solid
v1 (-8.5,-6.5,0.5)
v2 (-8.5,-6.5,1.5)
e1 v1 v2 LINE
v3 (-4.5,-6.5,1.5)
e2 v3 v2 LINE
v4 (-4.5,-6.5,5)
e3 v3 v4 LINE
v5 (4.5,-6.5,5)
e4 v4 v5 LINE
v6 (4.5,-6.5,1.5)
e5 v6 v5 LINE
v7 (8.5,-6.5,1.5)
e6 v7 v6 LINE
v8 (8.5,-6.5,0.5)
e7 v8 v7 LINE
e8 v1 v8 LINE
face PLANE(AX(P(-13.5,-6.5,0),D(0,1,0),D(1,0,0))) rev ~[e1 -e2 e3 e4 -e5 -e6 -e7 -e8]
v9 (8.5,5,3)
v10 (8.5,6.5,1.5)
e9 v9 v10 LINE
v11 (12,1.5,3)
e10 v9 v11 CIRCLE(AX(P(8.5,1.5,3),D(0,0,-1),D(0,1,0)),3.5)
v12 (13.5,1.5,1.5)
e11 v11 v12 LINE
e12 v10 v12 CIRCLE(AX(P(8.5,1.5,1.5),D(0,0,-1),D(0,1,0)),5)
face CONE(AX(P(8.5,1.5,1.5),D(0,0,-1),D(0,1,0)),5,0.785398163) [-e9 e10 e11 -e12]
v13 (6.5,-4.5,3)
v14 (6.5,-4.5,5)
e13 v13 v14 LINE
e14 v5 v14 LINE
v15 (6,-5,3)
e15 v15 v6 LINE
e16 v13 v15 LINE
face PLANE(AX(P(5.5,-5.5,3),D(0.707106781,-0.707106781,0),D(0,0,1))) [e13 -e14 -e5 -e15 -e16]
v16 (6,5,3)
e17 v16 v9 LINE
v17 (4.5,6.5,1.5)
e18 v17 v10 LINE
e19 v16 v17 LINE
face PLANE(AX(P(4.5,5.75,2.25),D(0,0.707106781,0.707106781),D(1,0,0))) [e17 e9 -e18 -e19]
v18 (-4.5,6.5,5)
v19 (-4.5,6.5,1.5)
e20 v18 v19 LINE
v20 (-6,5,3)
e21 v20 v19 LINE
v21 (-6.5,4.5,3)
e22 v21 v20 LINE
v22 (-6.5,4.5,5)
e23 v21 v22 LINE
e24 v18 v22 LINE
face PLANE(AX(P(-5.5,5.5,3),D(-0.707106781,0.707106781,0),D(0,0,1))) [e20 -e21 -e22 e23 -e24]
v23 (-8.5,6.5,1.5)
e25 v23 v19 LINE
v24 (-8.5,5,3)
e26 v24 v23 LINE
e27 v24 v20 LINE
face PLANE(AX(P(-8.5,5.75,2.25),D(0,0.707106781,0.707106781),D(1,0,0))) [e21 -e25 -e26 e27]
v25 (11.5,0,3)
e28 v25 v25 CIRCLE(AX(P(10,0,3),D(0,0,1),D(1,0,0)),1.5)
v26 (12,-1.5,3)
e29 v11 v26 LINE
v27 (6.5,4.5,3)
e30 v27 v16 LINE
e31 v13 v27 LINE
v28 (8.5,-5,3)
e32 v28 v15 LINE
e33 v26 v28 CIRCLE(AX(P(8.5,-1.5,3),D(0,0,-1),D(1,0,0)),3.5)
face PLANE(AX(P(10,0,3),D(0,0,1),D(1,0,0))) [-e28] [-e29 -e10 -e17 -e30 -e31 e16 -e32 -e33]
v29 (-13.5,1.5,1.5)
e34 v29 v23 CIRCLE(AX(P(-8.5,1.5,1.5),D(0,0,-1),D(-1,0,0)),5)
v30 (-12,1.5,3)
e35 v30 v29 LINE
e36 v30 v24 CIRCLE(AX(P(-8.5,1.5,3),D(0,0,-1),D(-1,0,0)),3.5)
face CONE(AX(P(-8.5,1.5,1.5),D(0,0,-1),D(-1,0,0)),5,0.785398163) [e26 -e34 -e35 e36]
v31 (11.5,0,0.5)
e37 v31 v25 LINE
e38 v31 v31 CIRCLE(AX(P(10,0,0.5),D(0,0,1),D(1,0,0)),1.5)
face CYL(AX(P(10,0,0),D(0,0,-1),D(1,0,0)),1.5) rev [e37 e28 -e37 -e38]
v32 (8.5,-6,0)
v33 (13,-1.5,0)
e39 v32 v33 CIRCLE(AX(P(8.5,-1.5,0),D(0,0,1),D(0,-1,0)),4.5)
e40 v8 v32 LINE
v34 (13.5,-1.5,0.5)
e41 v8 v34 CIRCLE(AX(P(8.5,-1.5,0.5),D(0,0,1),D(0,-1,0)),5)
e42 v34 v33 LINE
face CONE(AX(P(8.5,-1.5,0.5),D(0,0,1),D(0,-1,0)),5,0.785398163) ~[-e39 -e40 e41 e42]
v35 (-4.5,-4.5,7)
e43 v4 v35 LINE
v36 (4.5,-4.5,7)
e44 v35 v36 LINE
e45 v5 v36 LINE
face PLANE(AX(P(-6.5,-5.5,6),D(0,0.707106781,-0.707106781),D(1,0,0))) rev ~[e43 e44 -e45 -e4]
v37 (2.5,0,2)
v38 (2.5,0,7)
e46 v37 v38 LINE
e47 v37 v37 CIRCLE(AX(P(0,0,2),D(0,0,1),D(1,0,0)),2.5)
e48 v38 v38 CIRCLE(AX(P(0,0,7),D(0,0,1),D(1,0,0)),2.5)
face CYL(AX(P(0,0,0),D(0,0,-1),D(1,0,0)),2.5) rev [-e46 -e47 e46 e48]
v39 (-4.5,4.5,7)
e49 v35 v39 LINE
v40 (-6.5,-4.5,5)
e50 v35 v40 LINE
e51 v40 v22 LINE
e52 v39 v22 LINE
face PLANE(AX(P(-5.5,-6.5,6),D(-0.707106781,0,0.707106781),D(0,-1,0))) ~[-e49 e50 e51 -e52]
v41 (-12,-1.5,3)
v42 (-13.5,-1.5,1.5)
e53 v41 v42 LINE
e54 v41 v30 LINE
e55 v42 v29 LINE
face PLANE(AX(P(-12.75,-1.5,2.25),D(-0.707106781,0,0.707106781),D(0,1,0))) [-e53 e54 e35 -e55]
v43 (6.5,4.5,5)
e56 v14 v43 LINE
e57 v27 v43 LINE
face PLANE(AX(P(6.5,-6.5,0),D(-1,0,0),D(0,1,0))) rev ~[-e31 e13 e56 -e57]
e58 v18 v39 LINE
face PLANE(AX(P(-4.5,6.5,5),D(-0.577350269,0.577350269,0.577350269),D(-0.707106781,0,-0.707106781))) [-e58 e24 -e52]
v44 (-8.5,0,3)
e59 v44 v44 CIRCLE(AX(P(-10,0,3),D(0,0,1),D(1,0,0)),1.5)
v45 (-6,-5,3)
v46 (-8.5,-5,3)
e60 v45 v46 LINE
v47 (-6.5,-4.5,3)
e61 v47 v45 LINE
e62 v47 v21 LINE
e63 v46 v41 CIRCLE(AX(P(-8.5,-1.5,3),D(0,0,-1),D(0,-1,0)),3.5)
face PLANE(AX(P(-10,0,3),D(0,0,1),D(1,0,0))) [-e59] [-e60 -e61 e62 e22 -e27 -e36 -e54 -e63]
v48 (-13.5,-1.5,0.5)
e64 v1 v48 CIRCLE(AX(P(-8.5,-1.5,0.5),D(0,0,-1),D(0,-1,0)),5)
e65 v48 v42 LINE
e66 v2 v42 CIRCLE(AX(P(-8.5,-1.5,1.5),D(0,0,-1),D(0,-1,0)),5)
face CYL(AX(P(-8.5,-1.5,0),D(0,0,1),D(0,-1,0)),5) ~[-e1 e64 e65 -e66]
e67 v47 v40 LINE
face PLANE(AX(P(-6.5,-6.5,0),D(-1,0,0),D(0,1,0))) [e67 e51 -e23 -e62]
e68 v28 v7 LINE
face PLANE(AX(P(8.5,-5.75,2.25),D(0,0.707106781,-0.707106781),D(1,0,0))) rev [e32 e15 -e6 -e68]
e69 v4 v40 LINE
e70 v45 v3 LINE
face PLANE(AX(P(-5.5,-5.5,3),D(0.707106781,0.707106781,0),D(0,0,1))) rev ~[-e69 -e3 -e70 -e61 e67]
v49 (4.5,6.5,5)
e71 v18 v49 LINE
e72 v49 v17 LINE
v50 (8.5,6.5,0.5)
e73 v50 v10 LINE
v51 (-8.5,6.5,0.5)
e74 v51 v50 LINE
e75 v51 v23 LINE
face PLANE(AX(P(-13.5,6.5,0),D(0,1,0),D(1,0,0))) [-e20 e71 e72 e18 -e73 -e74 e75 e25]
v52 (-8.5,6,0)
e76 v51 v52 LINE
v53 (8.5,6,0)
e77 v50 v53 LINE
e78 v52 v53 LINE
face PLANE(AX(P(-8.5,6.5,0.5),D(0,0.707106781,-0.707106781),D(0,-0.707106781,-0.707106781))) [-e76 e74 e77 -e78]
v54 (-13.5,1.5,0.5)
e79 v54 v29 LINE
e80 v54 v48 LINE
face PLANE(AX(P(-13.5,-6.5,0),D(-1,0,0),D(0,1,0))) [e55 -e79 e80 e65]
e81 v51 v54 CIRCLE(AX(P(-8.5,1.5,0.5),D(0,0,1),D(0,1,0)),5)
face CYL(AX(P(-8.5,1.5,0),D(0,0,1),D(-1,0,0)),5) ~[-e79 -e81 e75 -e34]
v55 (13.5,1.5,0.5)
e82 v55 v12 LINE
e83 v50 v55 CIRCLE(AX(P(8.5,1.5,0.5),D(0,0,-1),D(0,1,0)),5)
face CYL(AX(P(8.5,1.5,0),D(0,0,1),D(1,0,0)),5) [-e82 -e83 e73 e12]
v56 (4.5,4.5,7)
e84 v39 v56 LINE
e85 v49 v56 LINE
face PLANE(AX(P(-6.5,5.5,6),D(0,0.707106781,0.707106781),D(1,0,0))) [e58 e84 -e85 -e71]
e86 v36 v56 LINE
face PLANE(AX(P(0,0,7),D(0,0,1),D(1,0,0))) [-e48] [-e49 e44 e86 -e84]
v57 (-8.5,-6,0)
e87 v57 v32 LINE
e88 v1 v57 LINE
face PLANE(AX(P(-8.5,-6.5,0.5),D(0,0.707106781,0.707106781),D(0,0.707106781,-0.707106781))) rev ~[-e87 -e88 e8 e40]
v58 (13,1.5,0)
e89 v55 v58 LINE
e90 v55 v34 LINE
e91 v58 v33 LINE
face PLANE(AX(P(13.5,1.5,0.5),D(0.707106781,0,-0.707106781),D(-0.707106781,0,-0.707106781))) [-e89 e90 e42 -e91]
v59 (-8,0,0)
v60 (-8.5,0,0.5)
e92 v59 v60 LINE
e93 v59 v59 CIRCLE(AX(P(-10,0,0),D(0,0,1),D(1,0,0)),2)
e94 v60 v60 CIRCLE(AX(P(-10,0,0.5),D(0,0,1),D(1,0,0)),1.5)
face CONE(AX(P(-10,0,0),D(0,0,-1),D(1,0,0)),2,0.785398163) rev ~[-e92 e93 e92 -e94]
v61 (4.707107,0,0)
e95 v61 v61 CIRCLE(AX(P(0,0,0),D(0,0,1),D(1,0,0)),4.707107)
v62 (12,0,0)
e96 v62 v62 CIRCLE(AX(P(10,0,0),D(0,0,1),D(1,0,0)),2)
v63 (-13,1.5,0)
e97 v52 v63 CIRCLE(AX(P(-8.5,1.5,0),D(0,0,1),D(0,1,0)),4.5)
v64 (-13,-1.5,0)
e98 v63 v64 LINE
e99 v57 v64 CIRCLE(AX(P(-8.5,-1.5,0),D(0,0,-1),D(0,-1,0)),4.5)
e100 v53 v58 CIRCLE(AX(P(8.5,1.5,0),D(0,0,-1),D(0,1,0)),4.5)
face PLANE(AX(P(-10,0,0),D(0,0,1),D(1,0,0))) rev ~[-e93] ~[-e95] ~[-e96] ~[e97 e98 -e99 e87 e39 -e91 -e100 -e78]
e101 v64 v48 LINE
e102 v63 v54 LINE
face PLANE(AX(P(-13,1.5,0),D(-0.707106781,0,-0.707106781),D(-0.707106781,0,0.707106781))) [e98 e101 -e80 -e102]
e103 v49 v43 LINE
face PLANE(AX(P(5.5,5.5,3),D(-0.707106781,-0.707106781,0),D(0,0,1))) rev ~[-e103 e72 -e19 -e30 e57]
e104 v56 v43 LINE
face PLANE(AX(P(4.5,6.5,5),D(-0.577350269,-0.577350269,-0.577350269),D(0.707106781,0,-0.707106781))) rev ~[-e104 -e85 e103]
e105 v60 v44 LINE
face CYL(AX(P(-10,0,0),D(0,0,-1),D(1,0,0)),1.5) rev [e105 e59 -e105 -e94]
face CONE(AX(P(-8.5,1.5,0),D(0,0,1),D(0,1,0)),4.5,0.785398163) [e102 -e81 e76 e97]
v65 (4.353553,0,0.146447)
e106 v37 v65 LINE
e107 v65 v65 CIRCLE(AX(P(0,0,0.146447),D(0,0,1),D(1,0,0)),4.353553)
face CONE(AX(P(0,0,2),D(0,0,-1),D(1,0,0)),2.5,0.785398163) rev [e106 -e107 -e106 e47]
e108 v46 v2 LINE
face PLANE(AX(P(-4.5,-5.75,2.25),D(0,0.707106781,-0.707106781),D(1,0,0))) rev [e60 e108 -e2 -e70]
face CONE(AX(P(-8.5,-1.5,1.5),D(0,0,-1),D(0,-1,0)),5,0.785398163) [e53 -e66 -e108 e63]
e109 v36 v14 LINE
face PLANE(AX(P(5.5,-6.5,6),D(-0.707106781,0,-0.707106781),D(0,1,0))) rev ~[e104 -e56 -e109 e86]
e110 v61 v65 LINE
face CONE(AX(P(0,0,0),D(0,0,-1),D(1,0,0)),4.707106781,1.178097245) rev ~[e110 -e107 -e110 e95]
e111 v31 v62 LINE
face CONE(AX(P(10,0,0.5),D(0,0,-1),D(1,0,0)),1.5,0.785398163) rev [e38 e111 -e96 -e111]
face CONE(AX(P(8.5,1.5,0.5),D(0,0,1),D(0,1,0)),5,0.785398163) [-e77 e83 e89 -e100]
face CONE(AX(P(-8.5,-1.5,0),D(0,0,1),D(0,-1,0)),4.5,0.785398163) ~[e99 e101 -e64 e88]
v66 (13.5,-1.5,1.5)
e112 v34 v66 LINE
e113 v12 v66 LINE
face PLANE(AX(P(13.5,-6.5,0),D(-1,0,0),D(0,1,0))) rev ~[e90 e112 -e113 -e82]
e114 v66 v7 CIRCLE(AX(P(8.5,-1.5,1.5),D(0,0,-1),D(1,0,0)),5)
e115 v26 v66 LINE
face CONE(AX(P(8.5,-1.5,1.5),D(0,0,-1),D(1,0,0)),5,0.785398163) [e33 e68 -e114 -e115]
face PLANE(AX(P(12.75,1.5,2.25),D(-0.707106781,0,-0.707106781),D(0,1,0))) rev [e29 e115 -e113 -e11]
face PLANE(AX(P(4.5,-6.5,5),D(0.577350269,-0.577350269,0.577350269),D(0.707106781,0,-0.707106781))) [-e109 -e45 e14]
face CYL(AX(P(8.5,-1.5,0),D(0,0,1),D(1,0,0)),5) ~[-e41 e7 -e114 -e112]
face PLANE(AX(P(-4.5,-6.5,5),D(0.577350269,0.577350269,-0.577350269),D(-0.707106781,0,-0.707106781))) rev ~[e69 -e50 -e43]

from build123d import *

# Parameters (mm, degrees)
F0_W         = 13
F0_H         = 13
F0_R         = 2.5
F1_DEPTH     = 7
F0_W_2       = 7
F0_R_2       = 1.5
F2_DEPTH     = 3
F3_SIZE      = 2
F4_R         = 5
F5_SIZE      = 1.5
F6_T1_DEPTH  = 3
F6_T3_DEPTH  = 17
F6_T6_ANGLE  = 90
F6_T8_ANGLE  = 90
F6_T10_ANGLE = 90
F6_T12_ANGLE = 90


# Not quite as in the source:
# - a fillet or chamfer that OpenCascade refuses, or shapes differently, is made with other operations: its cross-section is extruded or revolved along the edge and cut away or added


with BuildPart() as f1:
    # F0 (on Top) → F1 (new body)
    with BuildSketch(Plane.XY):
        Rectangle(F0_W, F0_H)
        Circle(F0_R, mode=Mode.SUBTRACT)
    extrude(amount=F1_DEPTH)

    # F0 (on Top) → F2 (join)
    with BuildSketch(Plane.XY):
        with Locations((-10, 0)):
            Rectangle(F0_W_2, F0_H)
        with Locations((-10, 0)):
            Circle(F0_R_2, mode=Mode.SUBTRACT)
        with Locations((10, 0)):
            Rectangle(F0_W_2, F0_H)
        with Locations((10, 0)):
            Circle(F0_R_2, mode=Mode.SUBTRACT)
    extrude(amount=F2_DEPTH)

    # F3
    f3_edges = [f1.edges().sort_by_distance(p)[0] for p in [
        (-2.5, 0, 0),
        (6.5, 0, 7),
        (-6.5, 0, 7),
        (0, -6.5, 7),
        (0, 6.5, 7),
        (-6.5, -6.5, 5),
        (6.5, -6.5, 5),
        (-6.5, 6.5, 5),
        (6.5, 6.5, 5),
    ]]
    chamfer(f3_edges, length=F3_SIZE)

    # F4
    f4_edges = [f1.edges().sort_by_distance(p)[0] for p in [
        (-13.5, 6.5, 1.5),
        (-13.5, -6.5, 1.5),
        (13.5, -6.5, 1.5),
        (13.5, 6.5, 1.5),
    ]]
    fillet(f4_edges, radius=F4_R)

    # F5
    f5_edges = [f1.edges().sort_by_distance(p)[0] for p in [
        (-12.035534, -5.035534, 3),
        (12.035534, -5.035534, 3),
        (7.5, 6.5, 3),
        (12.035534, 5.035534, 3),
        (13.5, 0, 3),
        (7.5, -6.5, 3),
        (-7.5, 6.5, 3),
        (-7.5, -6.5, 3),
        (-13.5, 0, 3),
        (-12.035534, 5.035534, 3),
    ]]
    chamfer(f5_edges, length=F5_SIZE)

    # F6: chamfer of 0.5 on 11 edges, made by hand

    # F6_s2 → F6_t1 (cut)
    with BuildSketch(Plane.XZ.offset(-1.5)):
        Polygon((-13, 0), (-13.5, 0.5), (-13.5, 0), align=None)
        Polygon((13.5, 0.5), (13, 0), (13.5, 0), align=None)
    extrude(amount=F6_T1_DEPTH, mode=Mode.SUBTRACT)

    # F6_s4 → F6_t3 (cut)
    with BuildSketch(Plane.YZ.offset(-8.5)):
        Polygon((6.5, 0.5), (6, 0), (6.5, 0), align=None)
        Polygon((-6.5, 0.5), (-6, 0), (-6.5, 0), align=None)
    extrude(amount=F6_T3_DEPTH, mode=Mode.SUBTRACT)

    # F6_s5 → F6_t6 (revolve, cut)
    with BuildSketch(Plane.YZ.offset(-8.5)):
        Polygon((6, 0), (6.5, 0.5), (6.5, 0), align=None)
    revolve(axis=Axis((-8.5, 1.5, 0), (0, 0, 1)), revolution_arc=F6_T6_ANGLE, mode=Mode.SUBTRACT)

    # F6_s7 → F6_t8 (revolve, cut)
    with BuildSketch(Plane.YZ.offset(-8.5)):
        Polygon((-6, 0), (-6.5, 0.5), (-6.5, 0), align=None)
    revolve(axis=Axis((-8.5, -1.5, 0), (0, 0, -1)), revolution_arc=F6_T8_ANGLE, mode=Mode.SUBTRACT)

    # F6_s9 → F6_t10 (revolve, cut)
    with BuildSketch(Plane.YZ.offset(8.5)):
        Polygon((6.5, 0.5), (6, 0), (6.5, 0), align=None)
    revolve(axis=Axis((8.5, 1.5, 0), (0, 0, -1)), revolution_arc=F6_T10_ANGLE, mode=Mode.SUBTRACT)

    # F6_s11 → F6_t12 (revolve, cut)
    with BuildSketch(Plane.YZ.offset(8.5)):
        Polygon((-6.5, 0.5), (-6, 0), (-6.5, 0), align=None)
    revolve(axis=Axis((8.5, -1.5, 0), (0, 0, 1)), revolution_arc=F6_T12_ANGLE, mode=Mode.SUBTRACT)

    # F6_s13 → F6_t14 (revolve, cut)
    with BuildSketch(Plane.XZ):
        Polygon((4.7071067812, 0), (4.3535533906, 0.1464466094), (4.5, 0), align=None)
    revolve(axis=Axis((0, 0, 0), (0, 0, 1)), mode=Mode.SUBTRACT)

    # F6_s15 → F6_t16 (revolve, cut)
    with BuildSketch(Plane.XZ):
        Polygon((11.5, 0.5), (12, 0), (11.5, 0), align=None)
    revolve(axis=Axis((10, 0, 0), (0, 0, 1)), mode=Mode.SUBTRACT)

    # F6_s17 → F6_t18 (revolve, cut)
    with BuildSketch(Plane.XZ):
        Polygon((-8, 0), (-8.5, 0.5), (-8.5, 0), align=None)
    revolve(axis=Axis((-10, 0, 0), (0, 0, 1)), mode=Mode.SUBTRACT)


solid = f1.part
